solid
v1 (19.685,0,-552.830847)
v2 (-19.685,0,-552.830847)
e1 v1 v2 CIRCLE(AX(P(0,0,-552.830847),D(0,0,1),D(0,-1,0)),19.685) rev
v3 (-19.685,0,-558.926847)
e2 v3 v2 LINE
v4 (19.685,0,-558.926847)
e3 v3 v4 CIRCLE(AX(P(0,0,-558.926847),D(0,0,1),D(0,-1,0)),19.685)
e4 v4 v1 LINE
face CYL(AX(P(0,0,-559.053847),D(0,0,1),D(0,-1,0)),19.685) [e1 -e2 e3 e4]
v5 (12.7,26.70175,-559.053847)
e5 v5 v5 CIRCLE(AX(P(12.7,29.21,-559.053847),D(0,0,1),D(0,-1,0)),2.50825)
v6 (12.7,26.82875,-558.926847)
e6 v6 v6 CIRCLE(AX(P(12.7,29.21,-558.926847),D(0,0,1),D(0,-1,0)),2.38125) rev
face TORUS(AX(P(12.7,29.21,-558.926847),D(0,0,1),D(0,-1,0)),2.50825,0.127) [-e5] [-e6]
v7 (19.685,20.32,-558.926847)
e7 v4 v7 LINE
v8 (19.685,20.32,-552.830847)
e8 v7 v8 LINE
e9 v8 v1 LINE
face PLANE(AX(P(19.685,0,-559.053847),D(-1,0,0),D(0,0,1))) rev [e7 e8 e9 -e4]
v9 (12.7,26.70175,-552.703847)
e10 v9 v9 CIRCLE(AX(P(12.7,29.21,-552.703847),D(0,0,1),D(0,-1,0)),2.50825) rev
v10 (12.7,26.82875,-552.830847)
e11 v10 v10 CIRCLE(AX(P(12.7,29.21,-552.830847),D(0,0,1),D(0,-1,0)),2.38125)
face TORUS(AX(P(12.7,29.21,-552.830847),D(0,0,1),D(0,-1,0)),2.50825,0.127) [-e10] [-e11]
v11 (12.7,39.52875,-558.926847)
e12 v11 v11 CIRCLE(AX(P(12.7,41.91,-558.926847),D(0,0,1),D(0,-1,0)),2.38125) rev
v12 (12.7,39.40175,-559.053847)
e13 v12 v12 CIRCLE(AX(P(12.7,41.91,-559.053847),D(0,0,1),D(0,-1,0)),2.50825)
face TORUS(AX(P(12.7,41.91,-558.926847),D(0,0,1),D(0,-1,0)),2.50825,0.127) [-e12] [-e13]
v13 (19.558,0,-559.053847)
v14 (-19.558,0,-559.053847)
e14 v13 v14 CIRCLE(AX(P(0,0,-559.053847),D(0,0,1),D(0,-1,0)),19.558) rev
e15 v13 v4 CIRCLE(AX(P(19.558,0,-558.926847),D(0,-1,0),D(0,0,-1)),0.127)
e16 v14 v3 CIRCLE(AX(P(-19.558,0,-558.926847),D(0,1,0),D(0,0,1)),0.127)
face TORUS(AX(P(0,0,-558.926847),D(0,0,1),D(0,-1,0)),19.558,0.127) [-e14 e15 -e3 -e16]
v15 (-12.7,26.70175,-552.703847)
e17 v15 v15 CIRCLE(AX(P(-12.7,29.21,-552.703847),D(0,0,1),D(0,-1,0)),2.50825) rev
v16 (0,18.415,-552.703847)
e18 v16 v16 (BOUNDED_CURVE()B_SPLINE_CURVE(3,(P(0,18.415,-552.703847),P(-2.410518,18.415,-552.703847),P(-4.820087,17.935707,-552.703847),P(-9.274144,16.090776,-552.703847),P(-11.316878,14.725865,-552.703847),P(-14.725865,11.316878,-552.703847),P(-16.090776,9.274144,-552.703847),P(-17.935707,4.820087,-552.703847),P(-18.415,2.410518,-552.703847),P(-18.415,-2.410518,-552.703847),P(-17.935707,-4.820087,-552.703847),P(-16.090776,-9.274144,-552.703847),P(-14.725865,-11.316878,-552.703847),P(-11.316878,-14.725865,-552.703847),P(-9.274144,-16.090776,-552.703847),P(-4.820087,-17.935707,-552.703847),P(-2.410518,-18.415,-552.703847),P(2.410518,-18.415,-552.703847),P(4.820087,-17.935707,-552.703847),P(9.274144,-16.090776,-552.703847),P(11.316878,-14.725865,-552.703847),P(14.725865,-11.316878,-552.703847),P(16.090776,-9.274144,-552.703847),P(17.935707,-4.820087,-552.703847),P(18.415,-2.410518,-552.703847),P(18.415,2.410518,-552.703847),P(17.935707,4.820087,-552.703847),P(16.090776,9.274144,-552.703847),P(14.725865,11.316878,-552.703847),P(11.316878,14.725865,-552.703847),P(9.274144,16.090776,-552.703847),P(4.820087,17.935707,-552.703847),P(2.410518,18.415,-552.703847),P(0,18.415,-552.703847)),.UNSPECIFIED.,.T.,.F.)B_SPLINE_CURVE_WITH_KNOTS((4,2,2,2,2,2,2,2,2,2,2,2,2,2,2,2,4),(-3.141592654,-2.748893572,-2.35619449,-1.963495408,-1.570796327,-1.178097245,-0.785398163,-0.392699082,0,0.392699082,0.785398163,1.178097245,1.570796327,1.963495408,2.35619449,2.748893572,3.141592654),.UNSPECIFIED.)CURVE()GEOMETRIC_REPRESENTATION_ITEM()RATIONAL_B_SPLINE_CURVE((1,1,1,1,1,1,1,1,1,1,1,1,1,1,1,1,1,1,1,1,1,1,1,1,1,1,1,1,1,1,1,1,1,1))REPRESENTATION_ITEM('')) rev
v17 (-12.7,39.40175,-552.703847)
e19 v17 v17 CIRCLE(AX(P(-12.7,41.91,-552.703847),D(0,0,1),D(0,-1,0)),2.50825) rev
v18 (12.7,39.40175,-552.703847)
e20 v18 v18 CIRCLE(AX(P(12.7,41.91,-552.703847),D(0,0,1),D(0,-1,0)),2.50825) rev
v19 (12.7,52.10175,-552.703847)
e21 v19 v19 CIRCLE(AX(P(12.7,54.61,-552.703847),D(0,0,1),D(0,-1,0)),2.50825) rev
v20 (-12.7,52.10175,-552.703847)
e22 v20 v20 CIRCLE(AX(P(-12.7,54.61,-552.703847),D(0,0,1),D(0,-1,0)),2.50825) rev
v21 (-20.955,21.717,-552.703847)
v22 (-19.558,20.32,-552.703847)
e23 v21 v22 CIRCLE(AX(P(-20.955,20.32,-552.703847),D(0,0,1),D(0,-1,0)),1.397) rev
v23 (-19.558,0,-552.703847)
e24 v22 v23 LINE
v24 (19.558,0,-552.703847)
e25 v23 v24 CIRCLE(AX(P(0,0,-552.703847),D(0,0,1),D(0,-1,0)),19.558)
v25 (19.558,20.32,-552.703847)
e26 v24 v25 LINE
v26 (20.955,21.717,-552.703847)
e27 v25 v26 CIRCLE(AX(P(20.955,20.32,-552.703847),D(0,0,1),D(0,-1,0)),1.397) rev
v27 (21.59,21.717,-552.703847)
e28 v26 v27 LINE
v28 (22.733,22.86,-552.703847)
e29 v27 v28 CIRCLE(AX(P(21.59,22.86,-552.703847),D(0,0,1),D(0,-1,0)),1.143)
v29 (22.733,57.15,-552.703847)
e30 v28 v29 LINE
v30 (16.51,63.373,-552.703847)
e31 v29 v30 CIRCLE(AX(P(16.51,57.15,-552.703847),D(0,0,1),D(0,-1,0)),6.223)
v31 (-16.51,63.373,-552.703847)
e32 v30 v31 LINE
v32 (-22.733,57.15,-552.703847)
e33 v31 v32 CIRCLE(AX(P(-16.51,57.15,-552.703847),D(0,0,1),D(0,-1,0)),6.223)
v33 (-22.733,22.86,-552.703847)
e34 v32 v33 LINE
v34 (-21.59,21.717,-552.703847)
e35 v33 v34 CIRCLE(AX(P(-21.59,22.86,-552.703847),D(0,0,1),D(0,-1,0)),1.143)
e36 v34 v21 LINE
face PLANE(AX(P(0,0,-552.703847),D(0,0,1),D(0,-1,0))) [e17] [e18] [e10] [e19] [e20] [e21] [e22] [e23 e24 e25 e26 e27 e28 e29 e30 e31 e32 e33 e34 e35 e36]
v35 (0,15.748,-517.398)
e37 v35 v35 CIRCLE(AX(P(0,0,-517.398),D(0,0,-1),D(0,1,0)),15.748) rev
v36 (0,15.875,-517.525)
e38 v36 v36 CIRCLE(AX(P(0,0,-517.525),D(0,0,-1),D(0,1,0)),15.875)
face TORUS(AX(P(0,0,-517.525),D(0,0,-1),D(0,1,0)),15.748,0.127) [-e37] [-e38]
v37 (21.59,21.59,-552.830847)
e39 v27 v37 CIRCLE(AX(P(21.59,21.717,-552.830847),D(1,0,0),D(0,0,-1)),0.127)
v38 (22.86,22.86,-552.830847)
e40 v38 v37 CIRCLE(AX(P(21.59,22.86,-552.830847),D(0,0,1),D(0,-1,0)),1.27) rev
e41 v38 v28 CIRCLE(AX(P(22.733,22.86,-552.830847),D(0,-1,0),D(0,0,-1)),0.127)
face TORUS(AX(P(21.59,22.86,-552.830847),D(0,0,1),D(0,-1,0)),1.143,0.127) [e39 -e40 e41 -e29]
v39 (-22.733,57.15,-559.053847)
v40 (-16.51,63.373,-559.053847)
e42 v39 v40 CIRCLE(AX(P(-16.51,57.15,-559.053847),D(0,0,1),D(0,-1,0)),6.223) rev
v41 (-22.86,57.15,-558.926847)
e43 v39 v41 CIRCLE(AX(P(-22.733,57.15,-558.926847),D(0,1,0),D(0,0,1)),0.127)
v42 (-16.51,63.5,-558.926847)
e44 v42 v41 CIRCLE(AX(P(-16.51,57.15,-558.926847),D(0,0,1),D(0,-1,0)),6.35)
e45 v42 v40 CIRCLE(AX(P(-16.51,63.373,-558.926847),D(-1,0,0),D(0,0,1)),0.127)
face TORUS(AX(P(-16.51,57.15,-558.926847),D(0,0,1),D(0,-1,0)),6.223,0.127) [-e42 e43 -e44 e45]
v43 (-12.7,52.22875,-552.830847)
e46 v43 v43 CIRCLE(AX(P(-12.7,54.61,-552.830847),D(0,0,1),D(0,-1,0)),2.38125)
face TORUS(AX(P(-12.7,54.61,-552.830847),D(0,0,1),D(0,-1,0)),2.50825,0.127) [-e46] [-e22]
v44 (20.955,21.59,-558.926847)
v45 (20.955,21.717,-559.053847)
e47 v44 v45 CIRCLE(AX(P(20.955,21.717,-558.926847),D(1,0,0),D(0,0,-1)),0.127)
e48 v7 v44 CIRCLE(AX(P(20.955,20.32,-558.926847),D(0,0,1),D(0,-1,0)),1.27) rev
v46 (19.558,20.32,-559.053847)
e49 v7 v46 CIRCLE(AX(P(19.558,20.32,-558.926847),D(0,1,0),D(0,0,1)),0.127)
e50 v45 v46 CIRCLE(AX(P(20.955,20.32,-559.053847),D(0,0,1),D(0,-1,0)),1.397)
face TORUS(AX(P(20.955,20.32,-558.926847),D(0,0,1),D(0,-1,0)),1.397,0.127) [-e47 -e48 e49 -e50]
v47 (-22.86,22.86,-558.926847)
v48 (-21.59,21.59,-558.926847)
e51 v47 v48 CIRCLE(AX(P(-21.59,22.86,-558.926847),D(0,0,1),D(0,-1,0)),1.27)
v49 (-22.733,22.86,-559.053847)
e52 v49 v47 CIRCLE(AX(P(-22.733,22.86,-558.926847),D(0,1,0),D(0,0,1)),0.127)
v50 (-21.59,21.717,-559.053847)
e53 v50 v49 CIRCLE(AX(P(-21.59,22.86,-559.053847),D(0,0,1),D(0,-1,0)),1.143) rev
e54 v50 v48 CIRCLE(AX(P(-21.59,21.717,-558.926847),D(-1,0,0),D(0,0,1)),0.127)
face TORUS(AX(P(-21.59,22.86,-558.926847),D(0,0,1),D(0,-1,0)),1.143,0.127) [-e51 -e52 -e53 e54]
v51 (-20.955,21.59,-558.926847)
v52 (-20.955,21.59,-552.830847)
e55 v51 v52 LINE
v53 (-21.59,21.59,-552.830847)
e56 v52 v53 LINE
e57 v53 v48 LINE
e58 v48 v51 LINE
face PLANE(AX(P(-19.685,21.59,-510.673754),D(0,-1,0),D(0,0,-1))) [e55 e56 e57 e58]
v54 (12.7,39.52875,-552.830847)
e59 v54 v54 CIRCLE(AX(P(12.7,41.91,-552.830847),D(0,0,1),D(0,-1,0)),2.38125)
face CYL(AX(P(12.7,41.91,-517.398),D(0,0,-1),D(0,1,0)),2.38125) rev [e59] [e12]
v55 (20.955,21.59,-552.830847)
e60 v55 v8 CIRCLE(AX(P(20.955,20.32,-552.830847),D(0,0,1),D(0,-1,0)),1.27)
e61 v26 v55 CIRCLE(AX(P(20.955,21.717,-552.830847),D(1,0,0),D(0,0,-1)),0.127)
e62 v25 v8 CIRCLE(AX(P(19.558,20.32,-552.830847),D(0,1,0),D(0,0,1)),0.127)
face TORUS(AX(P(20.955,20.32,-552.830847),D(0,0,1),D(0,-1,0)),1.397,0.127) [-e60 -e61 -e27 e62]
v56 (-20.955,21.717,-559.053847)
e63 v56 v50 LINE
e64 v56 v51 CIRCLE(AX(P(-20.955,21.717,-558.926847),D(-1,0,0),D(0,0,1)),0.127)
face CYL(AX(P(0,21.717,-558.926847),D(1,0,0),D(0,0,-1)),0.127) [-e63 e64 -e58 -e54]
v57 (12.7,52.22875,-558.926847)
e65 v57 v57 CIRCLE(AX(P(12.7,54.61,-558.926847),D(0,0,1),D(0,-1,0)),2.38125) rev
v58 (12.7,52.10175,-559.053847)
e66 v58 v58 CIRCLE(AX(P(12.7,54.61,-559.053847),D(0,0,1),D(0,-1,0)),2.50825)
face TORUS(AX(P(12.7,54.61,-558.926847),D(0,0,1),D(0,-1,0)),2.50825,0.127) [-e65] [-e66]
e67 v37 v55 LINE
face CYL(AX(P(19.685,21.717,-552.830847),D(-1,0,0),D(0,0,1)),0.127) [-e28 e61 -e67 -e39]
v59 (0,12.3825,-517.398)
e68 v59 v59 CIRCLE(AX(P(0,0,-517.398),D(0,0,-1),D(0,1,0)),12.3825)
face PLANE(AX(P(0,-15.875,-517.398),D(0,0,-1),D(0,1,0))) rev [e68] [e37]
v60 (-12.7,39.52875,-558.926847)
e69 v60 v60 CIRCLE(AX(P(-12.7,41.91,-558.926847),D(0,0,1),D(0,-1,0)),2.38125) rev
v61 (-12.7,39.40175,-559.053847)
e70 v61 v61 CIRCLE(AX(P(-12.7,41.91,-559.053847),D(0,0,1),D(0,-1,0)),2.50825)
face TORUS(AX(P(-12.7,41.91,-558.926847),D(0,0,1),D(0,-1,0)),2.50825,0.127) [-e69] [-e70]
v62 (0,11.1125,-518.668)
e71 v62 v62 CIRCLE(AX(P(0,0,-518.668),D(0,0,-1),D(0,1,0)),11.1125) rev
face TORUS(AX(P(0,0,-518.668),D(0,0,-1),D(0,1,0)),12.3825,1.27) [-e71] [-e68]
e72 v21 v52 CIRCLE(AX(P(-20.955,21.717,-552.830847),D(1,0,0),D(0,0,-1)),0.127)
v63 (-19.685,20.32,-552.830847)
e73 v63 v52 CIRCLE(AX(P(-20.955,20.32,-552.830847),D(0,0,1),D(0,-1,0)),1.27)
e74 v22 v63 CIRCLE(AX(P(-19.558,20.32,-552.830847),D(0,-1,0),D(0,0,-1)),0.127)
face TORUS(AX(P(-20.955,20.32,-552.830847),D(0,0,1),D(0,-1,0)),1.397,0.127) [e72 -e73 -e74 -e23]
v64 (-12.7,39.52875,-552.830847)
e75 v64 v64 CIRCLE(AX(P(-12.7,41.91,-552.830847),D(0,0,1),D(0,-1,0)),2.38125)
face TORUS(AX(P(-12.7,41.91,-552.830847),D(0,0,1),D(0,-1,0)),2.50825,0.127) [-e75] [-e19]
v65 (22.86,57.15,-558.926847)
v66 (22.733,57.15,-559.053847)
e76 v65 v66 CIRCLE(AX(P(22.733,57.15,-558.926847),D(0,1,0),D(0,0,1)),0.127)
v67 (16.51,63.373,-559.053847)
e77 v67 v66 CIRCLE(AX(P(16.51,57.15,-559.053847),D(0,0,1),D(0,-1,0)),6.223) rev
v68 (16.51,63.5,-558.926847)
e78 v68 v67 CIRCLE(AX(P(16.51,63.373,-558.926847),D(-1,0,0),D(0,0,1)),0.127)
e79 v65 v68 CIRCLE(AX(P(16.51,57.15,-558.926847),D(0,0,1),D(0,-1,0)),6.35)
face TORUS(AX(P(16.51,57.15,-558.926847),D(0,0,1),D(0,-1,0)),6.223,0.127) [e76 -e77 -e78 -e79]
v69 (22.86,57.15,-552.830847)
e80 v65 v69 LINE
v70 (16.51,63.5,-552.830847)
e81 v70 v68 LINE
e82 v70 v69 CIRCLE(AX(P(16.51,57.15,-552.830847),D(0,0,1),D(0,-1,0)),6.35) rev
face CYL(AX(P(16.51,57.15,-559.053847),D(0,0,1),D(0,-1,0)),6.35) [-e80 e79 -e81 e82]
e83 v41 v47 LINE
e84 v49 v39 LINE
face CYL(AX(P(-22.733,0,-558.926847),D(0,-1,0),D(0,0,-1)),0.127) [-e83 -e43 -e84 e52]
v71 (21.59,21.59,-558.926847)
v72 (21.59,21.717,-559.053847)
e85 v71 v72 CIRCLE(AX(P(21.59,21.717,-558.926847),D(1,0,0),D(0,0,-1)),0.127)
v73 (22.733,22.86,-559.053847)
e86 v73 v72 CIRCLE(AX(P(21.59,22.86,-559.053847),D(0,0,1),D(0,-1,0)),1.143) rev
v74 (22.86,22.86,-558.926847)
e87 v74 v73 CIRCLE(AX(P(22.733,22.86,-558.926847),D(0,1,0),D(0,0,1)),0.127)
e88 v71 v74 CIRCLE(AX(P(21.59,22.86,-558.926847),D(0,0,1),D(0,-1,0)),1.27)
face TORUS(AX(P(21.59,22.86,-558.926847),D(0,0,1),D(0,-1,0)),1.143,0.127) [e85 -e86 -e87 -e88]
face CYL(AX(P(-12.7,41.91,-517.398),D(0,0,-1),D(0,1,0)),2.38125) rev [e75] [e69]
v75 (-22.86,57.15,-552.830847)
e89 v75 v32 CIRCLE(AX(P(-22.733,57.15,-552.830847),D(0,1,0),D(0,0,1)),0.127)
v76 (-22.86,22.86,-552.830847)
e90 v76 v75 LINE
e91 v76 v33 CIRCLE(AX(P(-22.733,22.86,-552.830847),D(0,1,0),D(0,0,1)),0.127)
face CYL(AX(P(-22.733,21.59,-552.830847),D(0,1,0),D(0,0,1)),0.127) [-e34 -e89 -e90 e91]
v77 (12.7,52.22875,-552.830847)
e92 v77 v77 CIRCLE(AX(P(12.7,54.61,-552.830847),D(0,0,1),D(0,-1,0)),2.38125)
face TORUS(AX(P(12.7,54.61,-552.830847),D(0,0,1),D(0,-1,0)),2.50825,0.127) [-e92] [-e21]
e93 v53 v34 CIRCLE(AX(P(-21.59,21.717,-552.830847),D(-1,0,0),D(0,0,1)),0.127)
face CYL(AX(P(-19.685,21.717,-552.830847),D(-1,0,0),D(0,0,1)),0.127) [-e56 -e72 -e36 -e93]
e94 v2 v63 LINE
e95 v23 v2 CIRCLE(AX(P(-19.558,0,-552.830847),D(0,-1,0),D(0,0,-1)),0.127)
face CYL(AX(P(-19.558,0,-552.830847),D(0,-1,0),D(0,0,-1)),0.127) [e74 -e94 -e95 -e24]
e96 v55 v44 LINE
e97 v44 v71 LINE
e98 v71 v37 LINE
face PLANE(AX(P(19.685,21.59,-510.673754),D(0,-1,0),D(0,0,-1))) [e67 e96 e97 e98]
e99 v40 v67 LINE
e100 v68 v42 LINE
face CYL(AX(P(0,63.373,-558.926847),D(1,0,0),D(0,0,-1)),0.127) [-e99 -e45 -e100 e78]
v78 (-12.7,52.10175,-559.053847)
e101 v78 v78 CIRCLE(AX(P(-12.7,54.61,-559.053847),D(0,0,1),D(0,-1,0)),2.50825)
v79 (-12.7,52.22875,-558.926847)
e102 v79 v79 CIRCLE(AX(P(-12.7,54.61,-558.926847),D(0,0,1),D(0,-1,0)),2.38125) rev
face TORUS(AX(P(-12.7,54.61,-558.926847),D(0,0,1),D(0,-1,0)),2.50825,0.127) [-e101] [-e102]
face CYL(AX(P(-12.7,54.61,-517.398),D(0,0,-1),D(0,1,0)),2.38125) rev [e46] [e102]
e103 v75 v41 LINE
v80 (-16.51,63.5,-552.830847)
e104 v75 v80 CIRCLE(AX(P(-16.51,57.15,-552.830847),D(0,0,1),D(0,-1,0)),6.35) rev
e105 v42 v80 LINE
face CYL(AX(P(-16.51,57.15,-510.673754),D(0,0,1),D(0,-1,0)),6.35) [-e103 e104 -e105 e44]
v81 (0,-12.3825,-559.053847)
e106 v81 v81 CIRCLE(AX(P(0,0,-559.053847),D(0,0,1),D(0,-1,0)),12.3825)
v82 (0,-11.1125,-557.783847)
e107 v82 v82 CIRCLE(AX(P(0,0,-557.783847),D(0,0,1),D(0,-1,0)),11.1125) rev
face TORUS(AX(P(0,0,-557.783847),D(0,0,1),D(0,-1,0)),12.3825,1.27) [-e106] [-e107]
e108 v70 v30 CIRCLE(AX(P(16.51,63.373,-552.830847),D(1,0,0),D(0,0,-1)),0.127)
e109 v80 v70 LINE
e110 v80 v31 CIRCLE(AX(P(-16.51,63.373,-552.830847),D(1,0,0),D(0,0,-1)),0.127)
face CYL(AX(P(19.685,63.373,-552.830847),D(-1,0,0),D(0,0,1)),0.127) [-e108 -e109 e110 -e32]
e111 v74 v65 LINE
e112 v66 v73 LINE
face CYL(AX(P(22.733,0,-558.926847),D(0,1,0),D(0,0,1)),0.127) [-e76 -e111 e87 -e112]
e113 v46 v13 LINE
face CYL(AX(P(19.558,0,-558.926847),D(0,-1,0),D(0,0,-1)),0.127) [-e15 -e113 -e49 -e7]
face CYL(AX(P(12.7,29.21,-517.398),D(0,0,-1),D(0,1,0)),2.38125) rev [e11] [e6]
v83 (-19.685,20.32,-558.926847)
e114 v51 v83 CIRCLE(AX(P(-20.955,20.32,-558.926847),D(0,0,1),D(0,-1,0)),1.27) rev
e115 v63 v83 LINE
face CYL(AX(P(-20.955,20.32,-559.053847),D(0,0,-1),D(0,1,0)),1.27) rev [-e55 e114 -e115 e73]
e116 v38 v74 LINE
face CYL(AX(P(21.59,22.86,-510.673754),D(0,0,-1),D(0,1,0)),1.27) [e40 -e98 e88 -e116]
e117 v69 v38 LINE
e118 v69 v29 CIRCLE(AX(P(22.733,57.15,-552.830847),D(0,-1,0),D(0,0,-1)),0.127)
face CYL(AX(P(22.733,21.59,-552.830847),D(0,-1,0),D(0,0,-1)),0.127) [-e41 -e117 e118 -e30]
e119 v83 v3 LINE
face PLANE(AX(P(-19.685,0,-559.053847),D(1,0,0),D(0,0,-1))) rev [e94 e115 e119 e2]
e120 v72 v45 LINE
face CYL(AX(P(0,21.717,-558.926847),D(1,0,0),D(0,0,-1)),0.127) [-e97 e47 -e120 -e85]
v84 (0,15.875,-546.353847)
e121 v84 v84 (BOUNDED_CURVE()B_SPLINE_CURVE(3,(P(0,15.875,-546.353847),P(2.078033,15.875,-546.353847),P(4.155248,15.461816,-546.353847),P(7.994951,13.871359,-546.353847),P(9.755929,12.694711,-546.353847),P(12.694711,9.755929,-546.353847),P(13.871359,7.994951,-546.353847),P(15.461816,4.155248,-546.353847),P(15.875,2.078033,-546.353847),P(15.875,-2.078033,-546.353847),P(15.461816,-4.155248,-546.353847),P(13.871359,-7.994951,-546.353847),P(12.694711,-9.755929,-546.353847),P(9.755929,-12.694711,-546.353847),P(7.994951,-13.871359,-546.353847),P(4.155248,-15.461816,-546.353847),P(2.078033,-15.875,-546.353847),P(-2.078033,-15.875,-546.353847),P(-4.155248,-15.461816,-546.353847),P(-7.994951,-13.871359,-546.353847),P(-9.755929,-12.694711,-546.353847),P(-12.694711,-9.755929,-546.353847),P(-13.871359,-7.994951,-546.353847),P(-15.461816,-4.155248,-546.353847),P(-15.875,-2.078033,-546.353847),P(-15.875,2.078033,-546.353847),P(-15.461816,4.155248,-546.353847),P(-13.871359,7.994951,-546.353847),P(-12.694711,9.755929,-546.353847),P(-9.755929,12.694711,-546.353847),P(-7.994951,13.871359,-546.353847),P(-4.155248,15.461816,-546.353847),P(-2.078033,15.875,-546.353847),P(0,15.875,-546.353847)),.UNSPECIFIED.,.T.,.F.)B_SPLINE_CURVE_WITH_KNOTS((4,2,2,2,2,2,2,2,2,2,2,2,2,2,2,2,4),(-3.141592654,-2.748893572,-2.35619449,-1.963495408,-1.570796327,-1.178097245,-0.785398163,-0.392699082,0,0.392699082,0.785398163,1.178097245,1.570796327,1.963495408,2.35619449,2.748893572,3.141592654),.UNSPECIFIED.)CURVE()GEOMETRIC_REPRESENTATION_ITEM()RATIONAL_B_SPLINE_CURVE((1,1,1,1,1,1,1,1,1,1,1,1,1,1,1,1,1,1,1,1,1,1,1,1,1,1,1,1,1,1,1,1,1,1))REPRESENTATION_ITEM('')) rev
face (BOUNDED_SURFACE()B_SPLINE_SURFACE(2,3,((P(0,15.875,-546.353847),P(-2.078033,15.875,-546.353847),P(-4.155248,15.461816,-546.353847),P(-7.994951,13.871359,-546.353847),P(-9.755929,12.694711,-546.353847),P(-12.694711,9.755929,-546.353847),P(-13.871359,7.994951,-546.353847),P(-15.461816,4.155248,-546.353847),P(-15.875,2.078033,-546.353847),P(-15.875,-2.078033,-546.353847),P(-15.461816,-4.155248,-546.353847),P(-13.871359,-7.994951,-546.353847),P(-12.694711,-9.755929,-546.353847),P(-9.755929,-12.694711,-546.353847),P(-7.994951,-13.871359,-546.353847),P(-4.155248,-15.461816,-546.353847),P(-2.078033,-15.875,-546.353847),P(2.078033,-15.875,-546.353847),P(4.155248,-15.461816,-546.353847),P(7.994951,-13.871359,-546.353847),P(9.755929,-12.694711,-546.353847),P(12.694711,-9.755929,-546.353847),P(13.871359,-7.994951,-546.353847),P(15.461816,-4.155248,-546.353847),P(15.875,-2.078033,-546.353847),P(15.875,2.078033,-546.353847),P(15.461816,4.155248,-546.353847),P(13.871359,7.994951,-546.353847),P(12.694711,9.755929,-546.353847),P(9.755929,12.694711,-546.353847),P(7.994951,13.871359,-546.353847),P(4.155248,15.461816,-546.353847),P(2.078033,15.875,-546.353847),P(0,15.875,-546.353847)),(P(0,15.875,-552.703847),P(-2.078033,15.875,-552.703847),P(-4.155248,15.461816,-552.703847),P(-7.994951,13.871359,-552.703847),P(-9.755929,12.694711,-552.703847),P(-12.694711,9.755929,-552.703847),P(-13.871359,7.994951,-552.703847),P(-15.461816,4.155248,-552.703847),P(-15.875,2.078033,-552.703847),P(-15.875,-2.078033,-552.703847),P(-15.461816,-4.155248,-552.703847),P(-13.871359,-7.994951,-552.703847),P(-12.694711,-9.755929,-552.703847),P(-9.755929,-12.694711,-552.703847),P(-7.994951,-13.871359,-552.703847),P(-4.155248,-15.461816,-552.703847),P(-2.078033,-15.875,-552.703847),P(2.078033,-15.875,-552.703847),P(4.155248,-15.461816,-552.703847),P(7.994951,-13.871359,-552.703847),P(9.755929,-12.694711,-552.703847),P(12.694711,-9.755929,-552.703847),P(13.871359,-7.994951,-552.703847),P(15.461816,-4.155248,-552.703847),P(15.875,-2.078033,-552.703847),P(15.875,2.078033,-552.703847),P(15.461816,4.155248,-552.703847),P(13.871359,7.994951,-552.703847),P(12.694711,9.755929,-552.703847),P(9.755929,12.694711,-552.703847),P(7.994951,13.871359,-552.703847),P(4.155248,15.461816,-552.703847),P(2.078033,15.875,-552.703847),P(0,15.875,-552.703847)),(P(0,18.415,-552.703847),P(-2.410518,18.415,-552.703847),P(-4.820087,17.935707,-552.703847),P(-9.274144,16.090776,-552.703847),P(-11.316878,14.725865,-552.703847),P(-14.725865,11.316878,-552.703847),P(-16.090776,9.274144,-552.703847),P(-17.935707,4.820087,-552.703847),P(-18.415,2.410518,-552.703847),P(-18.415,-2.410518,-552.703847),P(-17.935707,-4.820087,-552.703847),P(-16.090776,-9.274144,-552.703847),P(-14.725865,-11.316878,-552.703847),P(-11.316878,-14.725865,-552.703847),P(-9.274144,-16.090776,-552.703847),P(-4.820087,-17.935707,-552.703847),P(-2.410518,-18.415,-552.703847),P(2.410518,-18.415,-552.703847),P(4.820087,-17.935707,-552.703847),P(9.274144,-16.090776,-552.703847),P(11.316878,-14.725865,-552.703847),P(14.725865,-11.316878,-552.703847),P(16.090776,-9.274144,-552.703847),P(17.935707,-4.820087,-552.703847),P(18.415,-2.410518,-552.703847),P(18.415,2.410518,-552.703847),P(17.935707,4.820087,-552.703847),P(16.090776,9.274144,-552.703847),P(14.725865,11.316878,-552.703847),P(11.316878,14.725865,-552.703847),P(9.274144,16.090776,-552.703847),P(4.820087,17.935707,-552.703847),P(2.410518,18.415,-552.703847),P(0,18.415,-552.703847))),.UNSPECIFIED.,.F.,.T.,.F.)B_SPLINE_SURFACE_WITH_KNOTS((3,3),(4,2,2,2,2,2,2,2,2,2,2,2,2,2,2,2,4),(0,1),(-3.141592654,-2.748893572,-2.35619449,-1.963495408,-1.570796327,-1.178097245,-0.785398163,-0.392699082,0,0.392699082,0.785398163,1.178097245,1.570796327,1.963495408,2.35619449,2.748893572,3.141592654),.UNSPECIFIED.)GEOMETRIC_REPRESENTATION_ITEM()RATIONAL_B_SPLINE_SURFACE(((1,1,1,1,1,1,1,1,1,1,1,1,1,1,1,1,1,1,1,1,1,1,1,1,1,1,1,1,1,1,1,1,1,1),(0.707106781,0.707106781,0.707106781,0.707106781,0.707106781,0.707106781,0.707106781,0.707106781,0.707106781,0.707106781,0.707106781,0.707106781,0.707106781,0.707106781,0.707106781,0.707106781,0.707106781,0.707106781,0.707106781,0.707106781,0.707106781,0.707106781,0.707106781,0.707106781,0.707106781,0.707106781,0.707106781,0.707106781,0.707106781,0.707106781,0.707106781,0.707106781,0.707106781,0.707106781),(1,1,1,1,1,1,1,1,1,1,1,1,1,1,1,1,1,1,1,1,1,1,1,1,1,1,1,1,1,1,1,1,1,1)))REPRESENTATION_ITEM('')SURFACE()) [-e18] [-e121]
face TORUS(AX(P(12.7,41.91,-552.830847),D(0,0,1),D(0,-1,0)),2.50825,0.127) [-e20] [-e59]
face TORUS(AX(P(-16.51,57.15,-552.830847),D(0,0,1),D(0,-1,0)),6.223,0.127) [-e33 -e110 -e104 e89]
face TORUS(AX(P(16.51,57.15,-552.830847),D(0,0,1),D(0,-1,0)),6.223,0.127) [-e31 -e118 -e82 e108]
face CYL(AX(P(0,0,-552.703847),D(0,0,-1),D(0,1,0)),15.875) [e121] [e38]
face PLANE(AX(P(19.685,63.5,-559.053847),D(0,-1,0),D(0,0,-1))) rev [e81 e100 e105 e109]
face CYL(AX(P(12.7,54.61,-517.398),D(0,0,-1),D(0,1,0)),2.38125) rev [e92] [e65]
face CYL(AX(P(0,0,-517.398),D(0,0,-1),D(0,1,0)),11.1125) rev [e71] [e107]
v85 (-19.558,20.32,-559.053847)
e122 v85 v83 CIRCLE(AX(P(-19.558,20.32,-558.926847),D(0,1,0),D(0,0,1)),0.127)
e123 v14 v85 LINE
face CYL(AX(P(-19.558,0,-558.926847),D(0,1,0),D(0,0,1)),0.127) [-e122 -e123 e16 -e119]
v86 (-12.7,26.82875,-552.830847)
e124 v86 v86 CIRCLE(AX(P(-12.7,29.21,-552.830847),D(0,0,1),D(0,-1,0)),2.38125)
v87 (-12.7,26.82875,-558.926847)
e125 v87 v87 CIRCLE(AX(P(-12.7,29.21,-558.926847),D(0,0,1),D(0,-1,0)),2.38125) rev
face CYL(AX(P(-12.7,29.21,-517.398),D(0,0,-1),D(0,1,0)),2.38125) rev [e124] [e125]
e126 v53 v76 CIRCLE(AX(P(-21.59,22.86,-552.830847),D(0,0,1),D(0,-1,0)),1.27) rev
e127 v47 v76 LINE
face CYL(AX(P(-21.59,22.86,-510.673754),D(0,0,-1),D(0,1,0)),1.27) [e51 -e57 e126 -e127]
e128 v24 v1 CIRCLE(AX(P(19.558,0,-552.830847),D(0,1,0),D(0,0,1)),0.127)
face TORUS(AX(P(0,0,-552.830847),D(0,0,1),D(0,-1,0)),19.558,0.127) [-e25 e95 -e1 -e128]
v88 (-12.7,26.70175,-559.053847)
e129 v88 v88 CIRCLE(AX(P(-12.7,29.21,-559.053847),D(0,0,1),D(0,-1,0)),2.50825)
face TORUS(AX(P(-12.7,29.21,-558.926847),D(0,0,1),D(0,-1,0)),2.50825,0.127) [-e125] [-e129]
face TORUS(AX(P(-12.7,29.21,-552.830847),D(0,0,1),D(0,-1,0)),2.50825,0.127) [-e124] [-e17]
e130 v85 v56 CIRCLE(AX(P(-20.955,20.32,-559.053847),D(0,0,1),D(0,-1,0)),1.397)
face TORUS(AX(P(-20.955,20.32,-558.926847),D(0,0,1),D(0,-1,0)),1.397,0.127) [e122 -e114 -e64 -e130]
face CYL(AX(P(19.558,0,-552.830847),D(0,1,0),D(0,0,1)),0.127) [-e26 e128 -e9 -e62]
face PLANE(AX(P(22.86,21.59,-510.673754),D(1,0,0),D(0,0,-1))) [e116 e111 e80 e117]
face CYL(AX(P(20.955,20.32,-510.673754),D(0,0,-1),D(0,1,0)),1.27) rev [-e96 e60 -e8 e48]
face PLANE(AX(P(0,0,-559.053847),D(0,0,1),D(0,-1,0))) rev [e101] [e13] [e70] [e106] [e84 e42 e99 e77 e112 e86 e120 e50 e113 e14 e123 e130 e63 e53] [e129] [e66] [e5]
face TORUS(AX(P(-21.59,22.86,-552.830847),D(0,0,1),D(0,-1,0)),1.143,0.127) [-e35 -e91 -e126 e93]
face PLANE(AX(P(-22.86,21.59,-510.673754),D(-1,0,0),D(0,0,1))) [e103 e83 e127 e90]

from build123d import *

# Parameters (mm, degrees)
SKETCH2_W               = 35.305846982
SKETCH2_H               = 15.875
BOSS_EXTRUDE1_DEPTH     = 6.35
CUT_EXTRUDE1_DEPTH      = 79.453545572
CUT_EXTRUDE1_DEPTH_BACK = 79.453545572
SKETCH5_R               = 11.1125
SKETCH7_W               = 3.175
SKETCH7_H               = 41.91
BOSS_EXTRUDE2_DEPTH     = 6.35
SKETCH8_R               = 2.38125
CUT_EXTRUDE2_DEPTH      = 80.309767291
FILLET1_SIZE            = 2.54
FILLET1_SIZE_2          = 6.35
FILLET2_R               = 1.27
FILLET3_R               = 6.35
FILLET4_R               = 1.27
FILLET5_R               = 0.127


with BuildPart() as part:
    # Sketch2 → Revolve1 (revolve)
    with BuildSketch(Plane(origin=(0, 0, 0), x_dir=(0, 0, -1), z_dir=(1, 0, 0)), mode=Mode.PRIVATE) as revolve1_sk:
        with Locations((535.050923491, -7.9375)):
            Rectangle(SKETCH2_W, SKETCH2_H)
    revolve(revolve1_sk.sketch.rotate(Axis((0, 0, -552.703846982), (0, 0, 1)), 180), axis=Axis((0, 0, -552.703846982), (0, 0, 1)))

    # Sketch4 → Boss-Extrude1 (add)
    with BuildSketch(Plane(origin=(0, 0, -552.703846982), x_dir=(-1, 0, 0), z_dir=(0, 0, -1))):
        with BuildLine():
            Line((-19.685, 0), (-19.685, 63.5))
            Line((-19.685, 63.5), (19.685, 63.5))
            Line((19.685, 63.5), (19.685, 0))
            ThreePointArc((19.685, 0), (0, -19.685), (-19.685, 0))
        make_face()
    extrude(amount=BOSS_EXTRUDE1_DEPTH)

    # Sketch5 → Cut-Extrude1 (cut, two sides: drawn at the far end of the back side and taken through both)
    with BuildSketch(Plane(origin=(0, 0, -559.053846982), x_dir=(-1, 0, 0), z_dir=(0, 0, -1)).offset(-CUT_EXTRUDE1_DEPTH_BACK)):
        with Locations(Location((0, 0, 0), (0, 0, 90))):
            Circle(SKETCH5_R)
    extrude(amount=CUT_EXTRUDE1_DEPTH + CUT_EXTRUDE1_DEPTH_BACK, mode=Mode.SUBTRACT)

    # Sketch7 → Boss-Extrude2 (add)
    with BuildSketch(Plane(origin=(0, 0, -559.053846982), x_dir=(-1, 0, 0), z_dir=(0, 0, -1))):
        with Locations((-21.2725, 42.545)):
            Rectangle(SKETCH7_W, SKETCH7_H)
        with Locations((21.2725, 42.545)):
            Rectangle(SKETCH7_W, SKETCH7_H)
    extrude(amount=-BOSS_EXTRUDE2_DEPTH)

    # Sketch8 → Cut-Extrude2 (cut, through all)
    with BuildSketch(Plane(origin=(0, 0, -559.053846982), x_dir=(-1, 0, 0), z_dir=(0, 0, -1))):
        with Locations(Location((12.7, 54.61, 0), (0, 0, 270))):
            Circle(SKETCH8_R)
        with Locations(Location((-12.7, 54.61, 0), (0, 0, 90))):
            Circle(SKETCH8_R)
        with Locations(Location((-12.7, 41.91, 0), (0, 0, 90))):
            Circle(SKETCH8_R)
        with Locations(Location((-12.7, 29.21, 0), (0, 0, 90))):
            Circle(SKETCH8_R)
        with Locations(Location((12.7, 41.91, 0), (0, 0, 270))):
            Circle(SKETCH8_R)
        with Locations(Location((12.7, 29.21, 0), (0, 0, 270))):
            Circle(SKETCH8_R)
    extrude(amount=-CUT_EXTRUDE2_DEPTH, mode=Mode.SUBTRACT)

    # Fillet1
    # an asymmetric fillet: 6.35, 2.54 mm, written as the material it adds along each edge
    with BuildSketch(Plane(origin=(0, 0, -552.703846982), x_dir=(0, 1, 0), z_dir=(1, 0, 0))) as fillet1_piece_1:
        with BuildLine():
            Bezier((15.875 + FILLET1_SIZE, 0), (15.875, 0), (15.875, FILLET1_SIZE_2), weights=[1, 0.707106781, 1])
            Line((15.875, FILLET1_SIZE_2), (15.875, 0))
            Line((15.875, 0), (15.875 + FILLET1_SIZE, 0))
        make_face()
    revolve(axis=Axis((0, 0, -552.703846982), (0, 0, 1)))

    # Fillet2
    fillet2_edges = [part.edges().sort_by_distance(p)[0] for p in [
        (22.86, 21.59, -555.878846982),
        (19.685, 21.59, -555.878846982),
        (-22.86, 21.59, -555.878846982),
        (-19.685, 21.59, -555.878846982),
    ]]
    fillet(fillet2_edges, radius=FILLET2_R)

    # Fillet3
    fillet3_edges = [part.edges().sort_by_distance(p)[0] for p in [
        (22.86, 63.5, -555.878846982),
        (-22.86, 63.5, -555.878846982),
    ]]
    fillet(fillet3_edges, radius=FILLET3_R)

    # Fillet4
    fillet4_edges = [part.edges().sort_by_distance(p)[0] for p in [
        (0, -11.1125, -517.398),
        (0, -11.1125, -559.053846982),
    ]]
    fillet(fillet4_edges, radius=FILLET4_R)

    # Fillet5
    fillet5_edges = [part.edges().sort_by_distance(p)[0] for p in [
        (-19.685, 10.16, -552.703846982),
        (20.056974388, 21.218025612, -552.703846982),
        (0, -19.685, -559.053846982),
        (-19.685, 10.16, -559.053846982),
        (0, 63.5, -552.703846982),
        (0, 63.5, -559.053846982),
        (22.86, 40.005, -559.053846982),
        (-21.000128061, 61.640128061, -559.053846982),
        (21.000128061, 61.640128061, -559.053846982),
        (22.86, 40.005, -552.703846982),
        (-21.000128061, 61.640128061, -552.703846982),
        (21.000128061, 61.640128061, -552.703846982),
        (0, -15.875, -517.398),
        (12.7, 39.52875, -552.703846982),
        (12.7, 39.52875, -559.053846982),
        (12.7, 26.82875, -552.703846982),
        (12.7, 26.82875, -559.053846982),
        (-12.7, 56.99125, -552.703846982),
        (-12.7, 56.99125, -559.053846982),
        (-12.7, 44.29125, -552.703846982),
        (-12.7, 44.29125, -559.053846982),
        (-12.7, 31.59125, -552.703846982),
        (-12.7, 31.59125, -559.053846982),
        (12.7, 52.22875, -552.703846982),
        (12.7, 52.22875, -559.053846982),
        (-21.2725, 21.59, -552.703846982),
        (-21.2725, 21.59, -559.053846982),
        (-22.86, 40.005, -559.053846982),
        (21.2725, 21.59, -559.053846982),
        (19.685, 10.16, -559.053846982),
        (22.488025612, 21.961974388, -559.053846982),
        (-22.488025612, 21.961974388, -559.053846982),
        (-22.86, 40.005, -552.703846982),
        (19.685, 10.16, -552.703846982),
        (21.2725, 21.59, -552.703846982),
        (22.488025612, 21.961974388, -552.703846982),
        (-22.488025612, 21.961974388, -552.703846982),
        (0, -19.685, -552.703846982),
        (-20.056974388, 21.218025612, -559.053846982),
        (-20.056974388, 21.218025612, -552.703846982),
        (20.056974388, 21.218025612, -559.053846982),
    ]]
    fillet(fillet5_edges, radius=FILLET5_R)


solid = part.part
